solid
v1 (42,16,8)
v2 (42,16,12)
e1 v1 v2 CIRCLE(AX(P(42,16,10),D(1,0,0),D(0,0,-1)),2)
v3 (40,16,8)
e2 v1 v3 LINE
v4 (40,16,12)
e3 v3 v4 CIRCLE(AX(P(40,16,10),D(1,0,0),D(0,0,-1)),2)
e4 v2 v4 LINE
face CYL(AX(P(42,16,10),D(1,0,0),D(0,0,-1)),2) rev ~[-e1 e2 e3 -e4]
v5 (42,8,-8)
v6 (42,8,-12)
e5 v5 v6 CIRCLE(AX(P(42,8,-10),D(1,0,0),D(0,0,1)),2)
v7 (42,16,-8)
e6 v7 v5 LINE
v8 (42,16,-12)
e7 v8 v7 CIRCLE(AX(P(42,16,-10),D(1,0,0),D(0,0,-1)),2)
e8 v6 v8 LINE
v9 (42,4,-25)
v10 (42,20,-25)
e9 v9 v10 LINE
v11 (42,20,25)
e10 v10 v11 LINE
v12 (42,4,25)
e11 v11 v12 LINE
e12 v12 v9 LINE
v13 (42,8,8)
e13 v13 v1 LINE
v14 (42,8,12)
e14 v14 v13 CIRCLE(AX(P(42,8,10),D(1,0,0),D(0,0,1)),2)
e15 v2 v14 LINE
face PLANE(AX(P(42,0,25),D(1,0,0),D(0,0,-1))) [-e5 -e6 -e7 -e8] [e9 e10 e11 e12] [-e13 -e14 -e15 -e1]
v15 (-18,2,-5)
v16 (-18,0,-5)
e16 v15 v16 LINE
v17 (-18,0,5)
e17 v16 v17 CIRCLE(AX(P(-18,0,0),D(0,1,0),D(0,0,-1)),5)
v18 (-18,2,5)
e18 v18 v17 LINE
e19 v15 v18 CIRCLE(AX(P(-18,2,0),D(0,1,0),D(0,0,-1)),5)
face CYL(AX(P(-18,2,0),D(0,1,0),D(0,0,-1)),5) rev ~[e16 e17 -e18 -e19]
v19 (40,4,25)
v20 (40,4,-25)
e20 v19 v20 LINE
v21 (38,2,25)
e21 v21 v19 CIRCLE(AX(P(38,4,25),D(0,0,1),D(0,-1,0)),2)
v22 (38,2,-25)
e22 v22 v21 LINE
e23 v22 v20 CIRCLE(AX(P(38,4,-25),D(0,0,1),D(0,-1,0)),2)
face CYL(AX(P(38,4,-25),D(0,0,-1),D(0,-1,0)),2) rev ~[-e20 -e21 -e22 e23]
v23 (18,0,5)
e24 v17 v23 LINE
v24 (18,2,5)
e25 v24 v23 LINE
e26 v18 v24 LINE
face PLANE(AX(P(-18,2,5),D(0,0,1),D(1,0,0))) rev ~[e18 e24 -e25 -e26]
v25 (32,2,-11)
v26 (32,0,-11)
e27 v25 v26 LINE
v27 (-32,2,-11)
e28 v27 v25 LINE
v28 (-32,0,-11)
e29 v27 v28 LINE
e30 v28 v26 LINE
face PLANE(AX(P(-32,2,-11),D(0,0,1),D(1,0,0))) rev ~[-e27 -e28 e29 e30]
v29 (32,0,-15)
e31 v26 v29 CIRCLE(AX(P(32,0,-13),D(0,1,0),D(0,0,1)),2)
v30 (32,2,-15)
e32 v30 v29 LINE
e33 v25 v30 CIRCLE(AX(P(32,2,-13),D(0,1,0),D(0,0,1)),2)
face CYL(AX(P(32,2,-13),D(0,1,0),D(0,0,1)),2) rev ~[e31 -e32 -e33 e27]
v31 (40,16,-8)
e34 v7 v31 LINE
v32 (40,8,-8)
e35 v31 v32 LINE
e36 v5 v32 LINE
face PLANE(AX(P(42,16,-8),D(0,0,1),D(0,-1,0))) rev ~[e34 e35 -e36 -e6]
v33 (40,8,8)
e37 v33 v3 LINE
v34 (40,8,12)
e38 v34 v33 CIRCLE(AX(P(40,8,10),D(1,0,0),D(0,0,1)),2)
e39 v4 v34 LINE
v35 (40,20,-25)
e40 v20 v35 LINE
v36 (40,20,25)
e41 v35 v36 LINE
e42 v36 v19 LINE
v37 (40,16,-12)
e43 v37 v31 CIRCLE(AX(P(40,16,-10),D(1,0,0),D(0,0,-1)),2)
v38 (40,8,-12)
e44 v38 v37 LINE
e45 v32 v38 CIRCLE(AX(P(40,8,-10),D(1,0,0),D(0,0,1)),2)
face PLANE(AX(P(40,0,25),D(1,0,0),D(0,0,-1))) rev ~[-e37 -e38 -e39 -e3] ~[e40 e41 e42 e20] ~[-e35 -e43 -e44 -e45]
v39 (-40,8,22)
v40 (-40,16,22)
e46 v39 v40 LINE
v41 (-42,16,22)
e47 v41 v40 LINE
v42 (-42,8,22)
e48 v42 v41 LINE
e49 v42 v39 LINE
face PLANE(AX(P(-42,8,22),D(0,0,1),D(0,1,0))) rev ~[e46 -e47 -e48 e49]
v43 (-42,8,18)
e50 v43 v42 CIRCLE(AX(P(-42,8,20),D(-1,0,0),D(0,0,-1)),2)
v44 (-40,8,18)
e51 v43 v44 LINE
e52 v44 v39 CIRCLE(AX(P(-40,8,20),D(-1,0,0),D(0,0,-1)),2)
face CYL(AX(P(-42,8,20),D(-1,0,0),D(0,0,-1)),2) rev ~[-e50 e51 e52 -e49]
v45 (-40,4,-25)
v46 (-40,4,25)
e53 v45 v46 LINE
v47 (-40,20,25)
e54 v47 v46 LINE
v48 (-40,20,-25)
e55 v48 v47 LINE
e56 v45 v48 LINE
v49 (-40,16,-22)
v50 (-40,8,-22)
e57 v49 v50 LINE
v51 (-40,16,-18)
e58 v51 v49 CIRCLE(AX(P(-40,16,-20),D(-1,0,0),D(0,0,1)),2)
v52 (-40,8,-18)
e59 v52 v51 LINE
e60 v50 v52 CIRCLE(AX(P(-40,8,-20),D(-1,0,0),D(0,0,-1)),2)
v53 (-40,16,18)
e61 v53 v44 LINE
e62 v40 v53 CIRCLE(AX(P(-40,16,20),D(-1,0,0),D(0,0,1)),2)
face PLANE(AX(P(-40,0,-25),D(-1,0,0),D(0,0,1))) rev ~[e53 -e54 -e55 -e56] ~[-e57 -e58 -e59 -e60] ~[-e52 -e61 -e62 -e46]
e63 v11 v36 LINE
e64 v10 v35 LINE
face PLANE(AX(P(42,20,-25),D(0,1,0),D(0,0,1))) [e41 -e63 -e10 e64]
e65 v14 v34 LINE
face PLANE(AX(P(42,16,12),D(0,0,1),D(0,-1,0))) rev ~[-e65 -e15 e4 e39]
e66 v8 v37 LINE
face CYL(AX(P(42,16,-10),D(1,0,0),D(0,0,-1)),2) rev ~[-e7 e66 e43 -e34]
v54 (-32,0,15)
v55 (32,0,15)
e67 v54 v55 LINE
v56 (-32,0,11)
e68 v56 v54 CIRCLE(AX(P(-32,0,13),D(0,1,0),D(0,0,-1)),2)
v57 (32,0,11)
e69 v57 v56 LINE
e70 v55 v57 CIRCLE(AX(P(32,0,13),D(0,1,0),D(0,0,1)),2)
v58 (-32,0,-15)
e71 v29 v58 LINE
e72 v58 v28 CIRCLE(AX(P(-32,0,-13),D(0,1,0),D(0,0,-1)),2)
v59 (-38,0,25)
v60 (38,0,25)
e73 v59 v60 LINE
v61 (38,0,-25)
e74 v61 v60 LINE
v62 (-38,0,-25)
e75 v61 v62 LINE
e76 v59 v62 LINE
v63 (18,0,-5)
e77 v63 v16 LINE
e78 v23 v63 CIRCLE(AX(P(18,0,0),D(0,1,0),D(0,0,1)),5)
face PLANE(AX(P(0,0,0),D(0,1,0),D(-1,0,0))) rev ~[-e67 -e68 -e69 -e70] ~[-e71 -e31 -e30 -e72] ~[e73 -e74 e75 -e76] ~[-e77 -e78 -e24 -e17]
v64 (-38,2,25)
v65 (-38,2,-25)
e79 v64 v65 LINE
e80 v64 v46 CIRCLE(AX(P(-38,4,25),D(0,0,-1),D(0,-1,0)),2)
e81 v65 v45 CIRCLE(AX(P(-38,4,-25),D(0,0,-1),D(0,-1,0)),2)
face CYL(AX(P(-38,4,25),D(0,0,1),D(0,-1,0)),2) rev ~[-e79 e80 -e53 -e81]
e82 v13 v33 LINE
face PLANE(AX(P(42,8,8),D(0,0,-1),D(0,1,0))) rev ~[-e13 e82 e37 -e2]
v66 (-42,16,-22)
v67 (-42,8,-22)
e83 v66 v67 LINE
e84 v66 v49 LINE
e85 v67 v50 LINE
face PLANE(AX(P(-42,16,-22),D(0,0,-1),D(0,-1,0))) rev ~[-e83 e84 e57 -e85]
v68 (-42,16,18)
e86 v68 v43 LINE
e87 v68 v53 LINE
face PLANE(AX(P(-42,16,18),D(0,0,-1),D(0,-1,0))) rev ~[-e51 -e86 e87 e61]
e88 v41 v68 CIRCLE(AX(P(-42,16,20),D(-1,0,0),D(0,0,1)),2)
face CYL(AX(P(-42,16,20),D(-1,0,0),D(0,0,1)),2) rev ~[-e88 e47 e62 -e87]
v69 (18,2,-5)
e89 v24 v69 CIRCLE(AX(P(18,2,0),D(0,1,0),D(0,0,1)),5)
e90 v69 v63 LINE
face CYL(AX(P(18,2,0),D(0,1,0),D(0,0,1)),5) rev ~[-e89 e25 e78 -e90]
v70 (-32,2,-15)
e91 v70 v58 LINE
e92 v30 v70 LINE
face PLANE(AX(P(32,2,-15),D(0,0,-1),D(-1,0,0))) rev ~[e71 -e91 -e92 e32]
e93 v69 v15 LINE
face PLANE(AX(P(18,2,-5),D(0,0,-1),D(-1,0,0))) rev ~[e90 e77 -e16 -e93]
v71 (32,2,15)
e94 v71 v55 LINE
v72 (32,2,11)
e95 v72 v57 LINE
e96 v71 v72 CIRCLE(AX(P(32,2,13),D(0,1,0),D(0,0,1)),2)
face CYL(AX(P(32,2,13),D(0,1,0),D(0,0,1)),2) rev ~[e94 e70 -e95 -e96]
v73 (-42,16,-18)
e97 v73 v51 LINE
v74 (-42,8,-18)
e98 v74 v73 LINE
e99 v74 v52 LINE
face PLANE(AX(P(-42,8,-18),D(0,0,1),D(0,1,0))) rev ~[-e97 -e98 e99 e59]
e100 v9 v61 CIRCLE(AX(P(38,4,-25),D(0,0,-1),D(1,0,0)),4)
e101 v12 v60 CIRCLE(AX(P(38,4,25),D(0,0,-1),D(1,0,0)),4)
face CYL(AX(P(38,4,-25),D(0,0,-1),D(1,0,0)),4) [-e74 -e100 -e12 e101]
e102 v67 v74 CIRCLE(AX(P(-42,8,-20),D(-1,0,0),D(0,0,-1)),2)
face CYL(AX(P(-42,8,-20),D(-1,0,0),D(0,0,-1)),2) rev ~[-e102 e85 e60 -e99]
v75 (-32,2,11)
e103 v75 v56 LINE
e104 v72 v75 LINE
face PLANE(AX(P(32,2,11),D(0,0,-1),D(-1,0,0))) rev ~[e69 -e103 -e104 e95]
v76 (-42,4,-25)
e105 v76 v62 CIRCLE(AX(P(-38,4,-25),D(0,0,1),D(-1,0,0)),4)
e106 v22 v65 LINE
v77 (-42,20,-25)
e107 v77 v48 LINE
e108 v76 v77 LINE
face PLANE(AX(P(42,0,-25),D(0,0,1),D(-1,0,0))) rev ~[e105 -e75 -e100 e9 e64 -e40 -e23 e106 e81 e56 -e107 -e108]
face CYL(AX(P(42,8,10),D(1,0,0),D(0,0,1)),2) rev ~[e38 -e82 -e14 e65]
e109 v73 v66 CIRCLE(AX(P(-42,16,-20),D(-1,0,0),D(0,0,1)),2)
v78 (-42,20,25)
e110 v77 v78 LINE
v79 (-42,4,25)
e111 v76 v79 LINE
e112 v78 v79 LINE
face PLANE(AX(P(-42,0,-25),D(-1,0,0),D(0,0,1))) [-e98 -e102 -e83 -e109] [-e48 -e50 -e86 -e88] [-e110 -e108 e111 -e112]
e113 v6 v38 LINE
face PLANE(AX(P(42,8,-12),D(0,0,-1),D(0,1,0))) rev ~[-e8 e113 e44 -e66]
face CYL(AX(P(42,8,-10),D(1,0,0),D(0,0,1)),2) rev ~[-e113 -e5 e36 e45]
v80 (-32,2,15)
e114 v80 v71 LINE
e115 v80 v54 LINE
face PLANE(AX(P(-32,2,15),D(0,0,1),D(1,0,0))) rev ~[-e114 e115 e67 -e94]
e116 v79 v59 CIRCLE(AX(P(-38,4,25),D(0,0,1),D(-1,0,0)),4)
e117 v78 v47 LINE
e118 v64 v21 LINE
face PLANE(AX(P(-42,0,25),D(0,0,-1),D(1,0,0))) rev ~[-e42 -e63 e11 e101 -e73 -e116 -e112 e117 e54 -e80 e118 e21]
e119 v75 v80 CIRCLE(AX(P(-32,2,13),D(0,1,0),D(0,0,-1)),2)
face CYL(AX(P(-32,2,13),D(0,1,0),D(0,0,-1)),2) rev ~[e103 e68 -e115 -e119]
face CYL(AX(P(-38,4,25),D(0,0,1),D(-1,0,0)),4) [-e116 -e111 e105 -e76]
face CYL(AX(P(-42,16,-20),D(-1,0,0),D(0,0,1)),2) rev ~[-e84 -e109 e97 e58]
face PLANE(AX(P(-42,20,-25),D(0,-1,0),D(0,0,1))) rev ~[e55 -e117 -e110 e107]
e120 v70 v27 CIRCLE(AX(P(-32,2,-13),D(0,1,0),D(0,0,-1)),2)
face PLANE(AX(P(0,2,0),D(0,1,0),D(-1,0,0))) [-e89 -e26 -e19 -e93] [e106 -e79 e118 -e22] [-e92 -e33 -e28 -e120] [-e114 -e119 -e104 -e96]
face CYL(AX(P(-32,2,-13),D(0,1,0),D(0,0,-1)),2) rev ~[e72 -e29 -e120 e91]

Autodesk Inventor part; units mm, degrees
ref_plane "YZ Plane" through (0, 0, 0) normal (1, 0, 0) x (0, 1, 0)
ref_plane "XZ Plane" through (0, 0, 0) normal (0, 1, 0) x (-1, 0, 0)
ref_plane "XY Plane" through (0, 0, 0) normal (0, 0, 1) x (1, 0, 0)
sketch "スケッチ1" plane through (0, 0, 0) normal (0, 1, 0) x (-1, 0, 0)
  line L0 (-42, -25) -> (42, -25)
  line L1 (42, -25) -> (42, 25)
  line L2 (42, 25) -> (-42, 25)
  line L3 (-42, 25) -> (-42, -25)
  line L4 (-42, -25) -> (42, 25) construction
  line L5 (42, -25) -> (-42, 25) construction
  point P0 (0, 0)
  dimension "d0" = 84
  dimension "d1" = 50
extrude "プレート1" add sketch "スケッチ1" along normal blind 2
sketch "スケッチ2" plane through (-42, 0, -25) normal (-1, 0, 0) x (0, 0, 1)
  line L0 (0, 0) -> (50, 0)
  line L1 (50, 0) -> (0, 0)
  line L2 (0, 0) -> (0, 20)
  line L3 (0, 20) -> (50, 20)
  line L4 (50, 20) -> (50, 0)
  point P0 (25, 0)
  dimension "d3" = 20
sheet face with bend "面2" sketch "スケッチ2" thickness 2 toward (1, 0, 0) bend radius 2
bend "曲げ1"
sketch "スケッチ3" plane through (42, 0, 25) normal (1, 0, 0) x (0, 0, -1)
  line L0 (0, 0) -> (50, 0)
  line L1 (50, 0) -> (50, 20)
  line L2 (50, 20) -> (0, 20)
  line L3 (0, 20) -> (0, 0)
  point P0 (25, 0)
  point P1 (50, 0)
  dimension "d9" = 20
sheet face with bend "面3" sketch "スケッチ3" thickness 2 toward (-1, 0, 0) bend radius 2
bend "曲げ2"
sketch "スケッチ4" plane through (0, 2, 0) normal (0, 1, 0) x (1, 0, 0)
  line L0 (-32, -15) -> (32, -15)
  arc A0 (32, -15) -> (32, -11) centre (32, -13) ccw
  line L1 (32, -11) -> (-32, -11)
  arc A1 (-32, -11) -> (-32, -15) centre (-32, -13) ccw
  line L2 (-18, -5) -> (18, -5)
  arc A2 (18, -5) -> (18, 5) centre (18, 0) ccw
  line L3 (18, 5) -> (-18, 5)
  arc A3 (-18, 5) -> (-18, -5) centre (-18, 0) ccw
  line L4 (-32, 11) -> (32, 11)
  arc A4 (32, 11) -> (32, 15) centre (32, 13) ccw
  line L5 (32, 15) -> (-32, 15)
  arc A5 (-32, 15) -> (-32, 11) centre (-32, 13) ccw
  line L6 (38, -25) -> (-38, -25) projected
  line L7 (38, -25) -> (38, 25) projected
  line L8 (-38, 25) -> (-38, -25) projected
  line L9 (-38, 25) -> (38, 25) projected
  point P0 (0, 0)
  dimension "d15" = 2
  dimension "d16" = 2
  dimension "d17" = 12
  dimension "d18" = 6
  dimension "d19" = 6
  dimension "d20" = 6
  dimension "d21" = 6
  dimension "d22" = 12
  dimension "d23" = 20
  dimension "d24" = 20
  dimension "d25" = 10
extrude "押し出し1" cut sketch "スケッチ4" against normal blind 10 contours A1 L1 A0 L0 | A3 L3 A2 L2 | A5 L5 A4 L4
sketch "スケッチ5" plane through (-42, 0, -25) normal (-1, 0, 0) x (0, 0, 1)
  line L0 (3, 16) -> (3, 8)
  arc A0 (3, 8) -> (7, 8) centre (5, 8) ccw
  line L1 (7, 8) -> (7, 16)
  arc A1 (7, 16) -> (3, 16) centre (5, 16) ccw
  line L2 (43, 16) -> (43, 8)
  arc A2 (43, 8) -> (47, 8) centre (45, 8) ccw
  line L3 (47, 8) -> (47, 16)
  arc A3 (47, 16) -> (43, 16) centre (45, 16) ccw
  line L4 (50, 4) -> (50, 20) projected
  line L5 (0, 20) -> (0, 4) projected
  line L6 (50, 20) -> (0, 20) projected
  line L7 (50, 4) -> (0, 4) projected
  point P0 (25, 0)
  dimension "d28" = 2
  dimension "d29" = 2
  dimension "d30" = 5
  dimension "d31" = 5
  dimension "d32" = 4
  dimension "d33" = 4
  dimension "d34" = 4
  dimension "d35" = 4
extrude "押し出し2" cut sketch "スケッチ5" against normal blind 10 contours A1 L1 A0 L0 | A3 L3 A2 L2
sketch "スケッチ6" plane through (42, 0, 25) normal (1, 0, 0) x (0, 0, -1)
  line L0 (13, 16) -> (13, 8)
  arc A0 (13, 8) -> (17, 8) centre (15, 8) ccw
  line L1 (17, 8) -> (17, 16)
  arc A1 (17, 16) -> (13, 16) centre (15, 16) ccw
  line L2 (33, 16) -> (33, 8)
  arc A2 (33, 8) -> (37, 8) centre (35, 8) ccw
  line L3 (37, 8) -> (37, 16)
  arc A3 (37, 16) -> (33, 16) centre (35, 16) ccw
  line L4 (50, 4) -> (50, 20) projected
  line L5 (0, 20) -> (0, 4) projected
  line L6 (50, 20) -> (0, 20) projected
  line L7 (50, 4) -> (0, 4) projected
  point P0 (25, 0)
  dimension "d38" = 2
  dimension "d39" = 2
  dimension "d40" = 15
  dimension "d41" = 15
  dimension "d42" = 4
  dimension "d43" = 4
extrude "押し出し3" cut sketch "スケッチ6" against normal blind 10 contours A1 L1 A0 L0 | A3 L3 A2 L2
equation "\"d2\" = Thickness"
equation "\"d4\" = BendRadius"
equation "\"d5\" = BendReliefWidth"
equation "\"d7\" = MinimumRemnant"
equation "\"d6\" = BendReliefDepth"
equation "\"d8\" = TransitionRadius"
equation "\"d10\" = BendRadius"
equation "\"d11\" = BendReliefWidth"
equation "\"d13\" = MinimumRemnant"
equation "\"d12\" = BendReliefDepth"
equation "\"d14\" = TransitionRadius"
equation "\"BendRadius\" = Thickness"
equation "\"BendReliefWidth\" = Thickness"
equation "\"BendReliefDepth\" = 0.5 * Thickness"
equation "\"CornerReliefSize\" = 4 * Thickness"
equation "\"MinimumRemnant\" = 2 * Thickness"
equation "\"TransitionRadius\" = BendRadius"
equation "\"JacobiRadiusSize\" = BendRadius"
equation "\"GapSize\" = Thickness"
equation "\"Thickness\" = 2"
properties part number "palmrest_cup" material "アルミニウム 6061"
